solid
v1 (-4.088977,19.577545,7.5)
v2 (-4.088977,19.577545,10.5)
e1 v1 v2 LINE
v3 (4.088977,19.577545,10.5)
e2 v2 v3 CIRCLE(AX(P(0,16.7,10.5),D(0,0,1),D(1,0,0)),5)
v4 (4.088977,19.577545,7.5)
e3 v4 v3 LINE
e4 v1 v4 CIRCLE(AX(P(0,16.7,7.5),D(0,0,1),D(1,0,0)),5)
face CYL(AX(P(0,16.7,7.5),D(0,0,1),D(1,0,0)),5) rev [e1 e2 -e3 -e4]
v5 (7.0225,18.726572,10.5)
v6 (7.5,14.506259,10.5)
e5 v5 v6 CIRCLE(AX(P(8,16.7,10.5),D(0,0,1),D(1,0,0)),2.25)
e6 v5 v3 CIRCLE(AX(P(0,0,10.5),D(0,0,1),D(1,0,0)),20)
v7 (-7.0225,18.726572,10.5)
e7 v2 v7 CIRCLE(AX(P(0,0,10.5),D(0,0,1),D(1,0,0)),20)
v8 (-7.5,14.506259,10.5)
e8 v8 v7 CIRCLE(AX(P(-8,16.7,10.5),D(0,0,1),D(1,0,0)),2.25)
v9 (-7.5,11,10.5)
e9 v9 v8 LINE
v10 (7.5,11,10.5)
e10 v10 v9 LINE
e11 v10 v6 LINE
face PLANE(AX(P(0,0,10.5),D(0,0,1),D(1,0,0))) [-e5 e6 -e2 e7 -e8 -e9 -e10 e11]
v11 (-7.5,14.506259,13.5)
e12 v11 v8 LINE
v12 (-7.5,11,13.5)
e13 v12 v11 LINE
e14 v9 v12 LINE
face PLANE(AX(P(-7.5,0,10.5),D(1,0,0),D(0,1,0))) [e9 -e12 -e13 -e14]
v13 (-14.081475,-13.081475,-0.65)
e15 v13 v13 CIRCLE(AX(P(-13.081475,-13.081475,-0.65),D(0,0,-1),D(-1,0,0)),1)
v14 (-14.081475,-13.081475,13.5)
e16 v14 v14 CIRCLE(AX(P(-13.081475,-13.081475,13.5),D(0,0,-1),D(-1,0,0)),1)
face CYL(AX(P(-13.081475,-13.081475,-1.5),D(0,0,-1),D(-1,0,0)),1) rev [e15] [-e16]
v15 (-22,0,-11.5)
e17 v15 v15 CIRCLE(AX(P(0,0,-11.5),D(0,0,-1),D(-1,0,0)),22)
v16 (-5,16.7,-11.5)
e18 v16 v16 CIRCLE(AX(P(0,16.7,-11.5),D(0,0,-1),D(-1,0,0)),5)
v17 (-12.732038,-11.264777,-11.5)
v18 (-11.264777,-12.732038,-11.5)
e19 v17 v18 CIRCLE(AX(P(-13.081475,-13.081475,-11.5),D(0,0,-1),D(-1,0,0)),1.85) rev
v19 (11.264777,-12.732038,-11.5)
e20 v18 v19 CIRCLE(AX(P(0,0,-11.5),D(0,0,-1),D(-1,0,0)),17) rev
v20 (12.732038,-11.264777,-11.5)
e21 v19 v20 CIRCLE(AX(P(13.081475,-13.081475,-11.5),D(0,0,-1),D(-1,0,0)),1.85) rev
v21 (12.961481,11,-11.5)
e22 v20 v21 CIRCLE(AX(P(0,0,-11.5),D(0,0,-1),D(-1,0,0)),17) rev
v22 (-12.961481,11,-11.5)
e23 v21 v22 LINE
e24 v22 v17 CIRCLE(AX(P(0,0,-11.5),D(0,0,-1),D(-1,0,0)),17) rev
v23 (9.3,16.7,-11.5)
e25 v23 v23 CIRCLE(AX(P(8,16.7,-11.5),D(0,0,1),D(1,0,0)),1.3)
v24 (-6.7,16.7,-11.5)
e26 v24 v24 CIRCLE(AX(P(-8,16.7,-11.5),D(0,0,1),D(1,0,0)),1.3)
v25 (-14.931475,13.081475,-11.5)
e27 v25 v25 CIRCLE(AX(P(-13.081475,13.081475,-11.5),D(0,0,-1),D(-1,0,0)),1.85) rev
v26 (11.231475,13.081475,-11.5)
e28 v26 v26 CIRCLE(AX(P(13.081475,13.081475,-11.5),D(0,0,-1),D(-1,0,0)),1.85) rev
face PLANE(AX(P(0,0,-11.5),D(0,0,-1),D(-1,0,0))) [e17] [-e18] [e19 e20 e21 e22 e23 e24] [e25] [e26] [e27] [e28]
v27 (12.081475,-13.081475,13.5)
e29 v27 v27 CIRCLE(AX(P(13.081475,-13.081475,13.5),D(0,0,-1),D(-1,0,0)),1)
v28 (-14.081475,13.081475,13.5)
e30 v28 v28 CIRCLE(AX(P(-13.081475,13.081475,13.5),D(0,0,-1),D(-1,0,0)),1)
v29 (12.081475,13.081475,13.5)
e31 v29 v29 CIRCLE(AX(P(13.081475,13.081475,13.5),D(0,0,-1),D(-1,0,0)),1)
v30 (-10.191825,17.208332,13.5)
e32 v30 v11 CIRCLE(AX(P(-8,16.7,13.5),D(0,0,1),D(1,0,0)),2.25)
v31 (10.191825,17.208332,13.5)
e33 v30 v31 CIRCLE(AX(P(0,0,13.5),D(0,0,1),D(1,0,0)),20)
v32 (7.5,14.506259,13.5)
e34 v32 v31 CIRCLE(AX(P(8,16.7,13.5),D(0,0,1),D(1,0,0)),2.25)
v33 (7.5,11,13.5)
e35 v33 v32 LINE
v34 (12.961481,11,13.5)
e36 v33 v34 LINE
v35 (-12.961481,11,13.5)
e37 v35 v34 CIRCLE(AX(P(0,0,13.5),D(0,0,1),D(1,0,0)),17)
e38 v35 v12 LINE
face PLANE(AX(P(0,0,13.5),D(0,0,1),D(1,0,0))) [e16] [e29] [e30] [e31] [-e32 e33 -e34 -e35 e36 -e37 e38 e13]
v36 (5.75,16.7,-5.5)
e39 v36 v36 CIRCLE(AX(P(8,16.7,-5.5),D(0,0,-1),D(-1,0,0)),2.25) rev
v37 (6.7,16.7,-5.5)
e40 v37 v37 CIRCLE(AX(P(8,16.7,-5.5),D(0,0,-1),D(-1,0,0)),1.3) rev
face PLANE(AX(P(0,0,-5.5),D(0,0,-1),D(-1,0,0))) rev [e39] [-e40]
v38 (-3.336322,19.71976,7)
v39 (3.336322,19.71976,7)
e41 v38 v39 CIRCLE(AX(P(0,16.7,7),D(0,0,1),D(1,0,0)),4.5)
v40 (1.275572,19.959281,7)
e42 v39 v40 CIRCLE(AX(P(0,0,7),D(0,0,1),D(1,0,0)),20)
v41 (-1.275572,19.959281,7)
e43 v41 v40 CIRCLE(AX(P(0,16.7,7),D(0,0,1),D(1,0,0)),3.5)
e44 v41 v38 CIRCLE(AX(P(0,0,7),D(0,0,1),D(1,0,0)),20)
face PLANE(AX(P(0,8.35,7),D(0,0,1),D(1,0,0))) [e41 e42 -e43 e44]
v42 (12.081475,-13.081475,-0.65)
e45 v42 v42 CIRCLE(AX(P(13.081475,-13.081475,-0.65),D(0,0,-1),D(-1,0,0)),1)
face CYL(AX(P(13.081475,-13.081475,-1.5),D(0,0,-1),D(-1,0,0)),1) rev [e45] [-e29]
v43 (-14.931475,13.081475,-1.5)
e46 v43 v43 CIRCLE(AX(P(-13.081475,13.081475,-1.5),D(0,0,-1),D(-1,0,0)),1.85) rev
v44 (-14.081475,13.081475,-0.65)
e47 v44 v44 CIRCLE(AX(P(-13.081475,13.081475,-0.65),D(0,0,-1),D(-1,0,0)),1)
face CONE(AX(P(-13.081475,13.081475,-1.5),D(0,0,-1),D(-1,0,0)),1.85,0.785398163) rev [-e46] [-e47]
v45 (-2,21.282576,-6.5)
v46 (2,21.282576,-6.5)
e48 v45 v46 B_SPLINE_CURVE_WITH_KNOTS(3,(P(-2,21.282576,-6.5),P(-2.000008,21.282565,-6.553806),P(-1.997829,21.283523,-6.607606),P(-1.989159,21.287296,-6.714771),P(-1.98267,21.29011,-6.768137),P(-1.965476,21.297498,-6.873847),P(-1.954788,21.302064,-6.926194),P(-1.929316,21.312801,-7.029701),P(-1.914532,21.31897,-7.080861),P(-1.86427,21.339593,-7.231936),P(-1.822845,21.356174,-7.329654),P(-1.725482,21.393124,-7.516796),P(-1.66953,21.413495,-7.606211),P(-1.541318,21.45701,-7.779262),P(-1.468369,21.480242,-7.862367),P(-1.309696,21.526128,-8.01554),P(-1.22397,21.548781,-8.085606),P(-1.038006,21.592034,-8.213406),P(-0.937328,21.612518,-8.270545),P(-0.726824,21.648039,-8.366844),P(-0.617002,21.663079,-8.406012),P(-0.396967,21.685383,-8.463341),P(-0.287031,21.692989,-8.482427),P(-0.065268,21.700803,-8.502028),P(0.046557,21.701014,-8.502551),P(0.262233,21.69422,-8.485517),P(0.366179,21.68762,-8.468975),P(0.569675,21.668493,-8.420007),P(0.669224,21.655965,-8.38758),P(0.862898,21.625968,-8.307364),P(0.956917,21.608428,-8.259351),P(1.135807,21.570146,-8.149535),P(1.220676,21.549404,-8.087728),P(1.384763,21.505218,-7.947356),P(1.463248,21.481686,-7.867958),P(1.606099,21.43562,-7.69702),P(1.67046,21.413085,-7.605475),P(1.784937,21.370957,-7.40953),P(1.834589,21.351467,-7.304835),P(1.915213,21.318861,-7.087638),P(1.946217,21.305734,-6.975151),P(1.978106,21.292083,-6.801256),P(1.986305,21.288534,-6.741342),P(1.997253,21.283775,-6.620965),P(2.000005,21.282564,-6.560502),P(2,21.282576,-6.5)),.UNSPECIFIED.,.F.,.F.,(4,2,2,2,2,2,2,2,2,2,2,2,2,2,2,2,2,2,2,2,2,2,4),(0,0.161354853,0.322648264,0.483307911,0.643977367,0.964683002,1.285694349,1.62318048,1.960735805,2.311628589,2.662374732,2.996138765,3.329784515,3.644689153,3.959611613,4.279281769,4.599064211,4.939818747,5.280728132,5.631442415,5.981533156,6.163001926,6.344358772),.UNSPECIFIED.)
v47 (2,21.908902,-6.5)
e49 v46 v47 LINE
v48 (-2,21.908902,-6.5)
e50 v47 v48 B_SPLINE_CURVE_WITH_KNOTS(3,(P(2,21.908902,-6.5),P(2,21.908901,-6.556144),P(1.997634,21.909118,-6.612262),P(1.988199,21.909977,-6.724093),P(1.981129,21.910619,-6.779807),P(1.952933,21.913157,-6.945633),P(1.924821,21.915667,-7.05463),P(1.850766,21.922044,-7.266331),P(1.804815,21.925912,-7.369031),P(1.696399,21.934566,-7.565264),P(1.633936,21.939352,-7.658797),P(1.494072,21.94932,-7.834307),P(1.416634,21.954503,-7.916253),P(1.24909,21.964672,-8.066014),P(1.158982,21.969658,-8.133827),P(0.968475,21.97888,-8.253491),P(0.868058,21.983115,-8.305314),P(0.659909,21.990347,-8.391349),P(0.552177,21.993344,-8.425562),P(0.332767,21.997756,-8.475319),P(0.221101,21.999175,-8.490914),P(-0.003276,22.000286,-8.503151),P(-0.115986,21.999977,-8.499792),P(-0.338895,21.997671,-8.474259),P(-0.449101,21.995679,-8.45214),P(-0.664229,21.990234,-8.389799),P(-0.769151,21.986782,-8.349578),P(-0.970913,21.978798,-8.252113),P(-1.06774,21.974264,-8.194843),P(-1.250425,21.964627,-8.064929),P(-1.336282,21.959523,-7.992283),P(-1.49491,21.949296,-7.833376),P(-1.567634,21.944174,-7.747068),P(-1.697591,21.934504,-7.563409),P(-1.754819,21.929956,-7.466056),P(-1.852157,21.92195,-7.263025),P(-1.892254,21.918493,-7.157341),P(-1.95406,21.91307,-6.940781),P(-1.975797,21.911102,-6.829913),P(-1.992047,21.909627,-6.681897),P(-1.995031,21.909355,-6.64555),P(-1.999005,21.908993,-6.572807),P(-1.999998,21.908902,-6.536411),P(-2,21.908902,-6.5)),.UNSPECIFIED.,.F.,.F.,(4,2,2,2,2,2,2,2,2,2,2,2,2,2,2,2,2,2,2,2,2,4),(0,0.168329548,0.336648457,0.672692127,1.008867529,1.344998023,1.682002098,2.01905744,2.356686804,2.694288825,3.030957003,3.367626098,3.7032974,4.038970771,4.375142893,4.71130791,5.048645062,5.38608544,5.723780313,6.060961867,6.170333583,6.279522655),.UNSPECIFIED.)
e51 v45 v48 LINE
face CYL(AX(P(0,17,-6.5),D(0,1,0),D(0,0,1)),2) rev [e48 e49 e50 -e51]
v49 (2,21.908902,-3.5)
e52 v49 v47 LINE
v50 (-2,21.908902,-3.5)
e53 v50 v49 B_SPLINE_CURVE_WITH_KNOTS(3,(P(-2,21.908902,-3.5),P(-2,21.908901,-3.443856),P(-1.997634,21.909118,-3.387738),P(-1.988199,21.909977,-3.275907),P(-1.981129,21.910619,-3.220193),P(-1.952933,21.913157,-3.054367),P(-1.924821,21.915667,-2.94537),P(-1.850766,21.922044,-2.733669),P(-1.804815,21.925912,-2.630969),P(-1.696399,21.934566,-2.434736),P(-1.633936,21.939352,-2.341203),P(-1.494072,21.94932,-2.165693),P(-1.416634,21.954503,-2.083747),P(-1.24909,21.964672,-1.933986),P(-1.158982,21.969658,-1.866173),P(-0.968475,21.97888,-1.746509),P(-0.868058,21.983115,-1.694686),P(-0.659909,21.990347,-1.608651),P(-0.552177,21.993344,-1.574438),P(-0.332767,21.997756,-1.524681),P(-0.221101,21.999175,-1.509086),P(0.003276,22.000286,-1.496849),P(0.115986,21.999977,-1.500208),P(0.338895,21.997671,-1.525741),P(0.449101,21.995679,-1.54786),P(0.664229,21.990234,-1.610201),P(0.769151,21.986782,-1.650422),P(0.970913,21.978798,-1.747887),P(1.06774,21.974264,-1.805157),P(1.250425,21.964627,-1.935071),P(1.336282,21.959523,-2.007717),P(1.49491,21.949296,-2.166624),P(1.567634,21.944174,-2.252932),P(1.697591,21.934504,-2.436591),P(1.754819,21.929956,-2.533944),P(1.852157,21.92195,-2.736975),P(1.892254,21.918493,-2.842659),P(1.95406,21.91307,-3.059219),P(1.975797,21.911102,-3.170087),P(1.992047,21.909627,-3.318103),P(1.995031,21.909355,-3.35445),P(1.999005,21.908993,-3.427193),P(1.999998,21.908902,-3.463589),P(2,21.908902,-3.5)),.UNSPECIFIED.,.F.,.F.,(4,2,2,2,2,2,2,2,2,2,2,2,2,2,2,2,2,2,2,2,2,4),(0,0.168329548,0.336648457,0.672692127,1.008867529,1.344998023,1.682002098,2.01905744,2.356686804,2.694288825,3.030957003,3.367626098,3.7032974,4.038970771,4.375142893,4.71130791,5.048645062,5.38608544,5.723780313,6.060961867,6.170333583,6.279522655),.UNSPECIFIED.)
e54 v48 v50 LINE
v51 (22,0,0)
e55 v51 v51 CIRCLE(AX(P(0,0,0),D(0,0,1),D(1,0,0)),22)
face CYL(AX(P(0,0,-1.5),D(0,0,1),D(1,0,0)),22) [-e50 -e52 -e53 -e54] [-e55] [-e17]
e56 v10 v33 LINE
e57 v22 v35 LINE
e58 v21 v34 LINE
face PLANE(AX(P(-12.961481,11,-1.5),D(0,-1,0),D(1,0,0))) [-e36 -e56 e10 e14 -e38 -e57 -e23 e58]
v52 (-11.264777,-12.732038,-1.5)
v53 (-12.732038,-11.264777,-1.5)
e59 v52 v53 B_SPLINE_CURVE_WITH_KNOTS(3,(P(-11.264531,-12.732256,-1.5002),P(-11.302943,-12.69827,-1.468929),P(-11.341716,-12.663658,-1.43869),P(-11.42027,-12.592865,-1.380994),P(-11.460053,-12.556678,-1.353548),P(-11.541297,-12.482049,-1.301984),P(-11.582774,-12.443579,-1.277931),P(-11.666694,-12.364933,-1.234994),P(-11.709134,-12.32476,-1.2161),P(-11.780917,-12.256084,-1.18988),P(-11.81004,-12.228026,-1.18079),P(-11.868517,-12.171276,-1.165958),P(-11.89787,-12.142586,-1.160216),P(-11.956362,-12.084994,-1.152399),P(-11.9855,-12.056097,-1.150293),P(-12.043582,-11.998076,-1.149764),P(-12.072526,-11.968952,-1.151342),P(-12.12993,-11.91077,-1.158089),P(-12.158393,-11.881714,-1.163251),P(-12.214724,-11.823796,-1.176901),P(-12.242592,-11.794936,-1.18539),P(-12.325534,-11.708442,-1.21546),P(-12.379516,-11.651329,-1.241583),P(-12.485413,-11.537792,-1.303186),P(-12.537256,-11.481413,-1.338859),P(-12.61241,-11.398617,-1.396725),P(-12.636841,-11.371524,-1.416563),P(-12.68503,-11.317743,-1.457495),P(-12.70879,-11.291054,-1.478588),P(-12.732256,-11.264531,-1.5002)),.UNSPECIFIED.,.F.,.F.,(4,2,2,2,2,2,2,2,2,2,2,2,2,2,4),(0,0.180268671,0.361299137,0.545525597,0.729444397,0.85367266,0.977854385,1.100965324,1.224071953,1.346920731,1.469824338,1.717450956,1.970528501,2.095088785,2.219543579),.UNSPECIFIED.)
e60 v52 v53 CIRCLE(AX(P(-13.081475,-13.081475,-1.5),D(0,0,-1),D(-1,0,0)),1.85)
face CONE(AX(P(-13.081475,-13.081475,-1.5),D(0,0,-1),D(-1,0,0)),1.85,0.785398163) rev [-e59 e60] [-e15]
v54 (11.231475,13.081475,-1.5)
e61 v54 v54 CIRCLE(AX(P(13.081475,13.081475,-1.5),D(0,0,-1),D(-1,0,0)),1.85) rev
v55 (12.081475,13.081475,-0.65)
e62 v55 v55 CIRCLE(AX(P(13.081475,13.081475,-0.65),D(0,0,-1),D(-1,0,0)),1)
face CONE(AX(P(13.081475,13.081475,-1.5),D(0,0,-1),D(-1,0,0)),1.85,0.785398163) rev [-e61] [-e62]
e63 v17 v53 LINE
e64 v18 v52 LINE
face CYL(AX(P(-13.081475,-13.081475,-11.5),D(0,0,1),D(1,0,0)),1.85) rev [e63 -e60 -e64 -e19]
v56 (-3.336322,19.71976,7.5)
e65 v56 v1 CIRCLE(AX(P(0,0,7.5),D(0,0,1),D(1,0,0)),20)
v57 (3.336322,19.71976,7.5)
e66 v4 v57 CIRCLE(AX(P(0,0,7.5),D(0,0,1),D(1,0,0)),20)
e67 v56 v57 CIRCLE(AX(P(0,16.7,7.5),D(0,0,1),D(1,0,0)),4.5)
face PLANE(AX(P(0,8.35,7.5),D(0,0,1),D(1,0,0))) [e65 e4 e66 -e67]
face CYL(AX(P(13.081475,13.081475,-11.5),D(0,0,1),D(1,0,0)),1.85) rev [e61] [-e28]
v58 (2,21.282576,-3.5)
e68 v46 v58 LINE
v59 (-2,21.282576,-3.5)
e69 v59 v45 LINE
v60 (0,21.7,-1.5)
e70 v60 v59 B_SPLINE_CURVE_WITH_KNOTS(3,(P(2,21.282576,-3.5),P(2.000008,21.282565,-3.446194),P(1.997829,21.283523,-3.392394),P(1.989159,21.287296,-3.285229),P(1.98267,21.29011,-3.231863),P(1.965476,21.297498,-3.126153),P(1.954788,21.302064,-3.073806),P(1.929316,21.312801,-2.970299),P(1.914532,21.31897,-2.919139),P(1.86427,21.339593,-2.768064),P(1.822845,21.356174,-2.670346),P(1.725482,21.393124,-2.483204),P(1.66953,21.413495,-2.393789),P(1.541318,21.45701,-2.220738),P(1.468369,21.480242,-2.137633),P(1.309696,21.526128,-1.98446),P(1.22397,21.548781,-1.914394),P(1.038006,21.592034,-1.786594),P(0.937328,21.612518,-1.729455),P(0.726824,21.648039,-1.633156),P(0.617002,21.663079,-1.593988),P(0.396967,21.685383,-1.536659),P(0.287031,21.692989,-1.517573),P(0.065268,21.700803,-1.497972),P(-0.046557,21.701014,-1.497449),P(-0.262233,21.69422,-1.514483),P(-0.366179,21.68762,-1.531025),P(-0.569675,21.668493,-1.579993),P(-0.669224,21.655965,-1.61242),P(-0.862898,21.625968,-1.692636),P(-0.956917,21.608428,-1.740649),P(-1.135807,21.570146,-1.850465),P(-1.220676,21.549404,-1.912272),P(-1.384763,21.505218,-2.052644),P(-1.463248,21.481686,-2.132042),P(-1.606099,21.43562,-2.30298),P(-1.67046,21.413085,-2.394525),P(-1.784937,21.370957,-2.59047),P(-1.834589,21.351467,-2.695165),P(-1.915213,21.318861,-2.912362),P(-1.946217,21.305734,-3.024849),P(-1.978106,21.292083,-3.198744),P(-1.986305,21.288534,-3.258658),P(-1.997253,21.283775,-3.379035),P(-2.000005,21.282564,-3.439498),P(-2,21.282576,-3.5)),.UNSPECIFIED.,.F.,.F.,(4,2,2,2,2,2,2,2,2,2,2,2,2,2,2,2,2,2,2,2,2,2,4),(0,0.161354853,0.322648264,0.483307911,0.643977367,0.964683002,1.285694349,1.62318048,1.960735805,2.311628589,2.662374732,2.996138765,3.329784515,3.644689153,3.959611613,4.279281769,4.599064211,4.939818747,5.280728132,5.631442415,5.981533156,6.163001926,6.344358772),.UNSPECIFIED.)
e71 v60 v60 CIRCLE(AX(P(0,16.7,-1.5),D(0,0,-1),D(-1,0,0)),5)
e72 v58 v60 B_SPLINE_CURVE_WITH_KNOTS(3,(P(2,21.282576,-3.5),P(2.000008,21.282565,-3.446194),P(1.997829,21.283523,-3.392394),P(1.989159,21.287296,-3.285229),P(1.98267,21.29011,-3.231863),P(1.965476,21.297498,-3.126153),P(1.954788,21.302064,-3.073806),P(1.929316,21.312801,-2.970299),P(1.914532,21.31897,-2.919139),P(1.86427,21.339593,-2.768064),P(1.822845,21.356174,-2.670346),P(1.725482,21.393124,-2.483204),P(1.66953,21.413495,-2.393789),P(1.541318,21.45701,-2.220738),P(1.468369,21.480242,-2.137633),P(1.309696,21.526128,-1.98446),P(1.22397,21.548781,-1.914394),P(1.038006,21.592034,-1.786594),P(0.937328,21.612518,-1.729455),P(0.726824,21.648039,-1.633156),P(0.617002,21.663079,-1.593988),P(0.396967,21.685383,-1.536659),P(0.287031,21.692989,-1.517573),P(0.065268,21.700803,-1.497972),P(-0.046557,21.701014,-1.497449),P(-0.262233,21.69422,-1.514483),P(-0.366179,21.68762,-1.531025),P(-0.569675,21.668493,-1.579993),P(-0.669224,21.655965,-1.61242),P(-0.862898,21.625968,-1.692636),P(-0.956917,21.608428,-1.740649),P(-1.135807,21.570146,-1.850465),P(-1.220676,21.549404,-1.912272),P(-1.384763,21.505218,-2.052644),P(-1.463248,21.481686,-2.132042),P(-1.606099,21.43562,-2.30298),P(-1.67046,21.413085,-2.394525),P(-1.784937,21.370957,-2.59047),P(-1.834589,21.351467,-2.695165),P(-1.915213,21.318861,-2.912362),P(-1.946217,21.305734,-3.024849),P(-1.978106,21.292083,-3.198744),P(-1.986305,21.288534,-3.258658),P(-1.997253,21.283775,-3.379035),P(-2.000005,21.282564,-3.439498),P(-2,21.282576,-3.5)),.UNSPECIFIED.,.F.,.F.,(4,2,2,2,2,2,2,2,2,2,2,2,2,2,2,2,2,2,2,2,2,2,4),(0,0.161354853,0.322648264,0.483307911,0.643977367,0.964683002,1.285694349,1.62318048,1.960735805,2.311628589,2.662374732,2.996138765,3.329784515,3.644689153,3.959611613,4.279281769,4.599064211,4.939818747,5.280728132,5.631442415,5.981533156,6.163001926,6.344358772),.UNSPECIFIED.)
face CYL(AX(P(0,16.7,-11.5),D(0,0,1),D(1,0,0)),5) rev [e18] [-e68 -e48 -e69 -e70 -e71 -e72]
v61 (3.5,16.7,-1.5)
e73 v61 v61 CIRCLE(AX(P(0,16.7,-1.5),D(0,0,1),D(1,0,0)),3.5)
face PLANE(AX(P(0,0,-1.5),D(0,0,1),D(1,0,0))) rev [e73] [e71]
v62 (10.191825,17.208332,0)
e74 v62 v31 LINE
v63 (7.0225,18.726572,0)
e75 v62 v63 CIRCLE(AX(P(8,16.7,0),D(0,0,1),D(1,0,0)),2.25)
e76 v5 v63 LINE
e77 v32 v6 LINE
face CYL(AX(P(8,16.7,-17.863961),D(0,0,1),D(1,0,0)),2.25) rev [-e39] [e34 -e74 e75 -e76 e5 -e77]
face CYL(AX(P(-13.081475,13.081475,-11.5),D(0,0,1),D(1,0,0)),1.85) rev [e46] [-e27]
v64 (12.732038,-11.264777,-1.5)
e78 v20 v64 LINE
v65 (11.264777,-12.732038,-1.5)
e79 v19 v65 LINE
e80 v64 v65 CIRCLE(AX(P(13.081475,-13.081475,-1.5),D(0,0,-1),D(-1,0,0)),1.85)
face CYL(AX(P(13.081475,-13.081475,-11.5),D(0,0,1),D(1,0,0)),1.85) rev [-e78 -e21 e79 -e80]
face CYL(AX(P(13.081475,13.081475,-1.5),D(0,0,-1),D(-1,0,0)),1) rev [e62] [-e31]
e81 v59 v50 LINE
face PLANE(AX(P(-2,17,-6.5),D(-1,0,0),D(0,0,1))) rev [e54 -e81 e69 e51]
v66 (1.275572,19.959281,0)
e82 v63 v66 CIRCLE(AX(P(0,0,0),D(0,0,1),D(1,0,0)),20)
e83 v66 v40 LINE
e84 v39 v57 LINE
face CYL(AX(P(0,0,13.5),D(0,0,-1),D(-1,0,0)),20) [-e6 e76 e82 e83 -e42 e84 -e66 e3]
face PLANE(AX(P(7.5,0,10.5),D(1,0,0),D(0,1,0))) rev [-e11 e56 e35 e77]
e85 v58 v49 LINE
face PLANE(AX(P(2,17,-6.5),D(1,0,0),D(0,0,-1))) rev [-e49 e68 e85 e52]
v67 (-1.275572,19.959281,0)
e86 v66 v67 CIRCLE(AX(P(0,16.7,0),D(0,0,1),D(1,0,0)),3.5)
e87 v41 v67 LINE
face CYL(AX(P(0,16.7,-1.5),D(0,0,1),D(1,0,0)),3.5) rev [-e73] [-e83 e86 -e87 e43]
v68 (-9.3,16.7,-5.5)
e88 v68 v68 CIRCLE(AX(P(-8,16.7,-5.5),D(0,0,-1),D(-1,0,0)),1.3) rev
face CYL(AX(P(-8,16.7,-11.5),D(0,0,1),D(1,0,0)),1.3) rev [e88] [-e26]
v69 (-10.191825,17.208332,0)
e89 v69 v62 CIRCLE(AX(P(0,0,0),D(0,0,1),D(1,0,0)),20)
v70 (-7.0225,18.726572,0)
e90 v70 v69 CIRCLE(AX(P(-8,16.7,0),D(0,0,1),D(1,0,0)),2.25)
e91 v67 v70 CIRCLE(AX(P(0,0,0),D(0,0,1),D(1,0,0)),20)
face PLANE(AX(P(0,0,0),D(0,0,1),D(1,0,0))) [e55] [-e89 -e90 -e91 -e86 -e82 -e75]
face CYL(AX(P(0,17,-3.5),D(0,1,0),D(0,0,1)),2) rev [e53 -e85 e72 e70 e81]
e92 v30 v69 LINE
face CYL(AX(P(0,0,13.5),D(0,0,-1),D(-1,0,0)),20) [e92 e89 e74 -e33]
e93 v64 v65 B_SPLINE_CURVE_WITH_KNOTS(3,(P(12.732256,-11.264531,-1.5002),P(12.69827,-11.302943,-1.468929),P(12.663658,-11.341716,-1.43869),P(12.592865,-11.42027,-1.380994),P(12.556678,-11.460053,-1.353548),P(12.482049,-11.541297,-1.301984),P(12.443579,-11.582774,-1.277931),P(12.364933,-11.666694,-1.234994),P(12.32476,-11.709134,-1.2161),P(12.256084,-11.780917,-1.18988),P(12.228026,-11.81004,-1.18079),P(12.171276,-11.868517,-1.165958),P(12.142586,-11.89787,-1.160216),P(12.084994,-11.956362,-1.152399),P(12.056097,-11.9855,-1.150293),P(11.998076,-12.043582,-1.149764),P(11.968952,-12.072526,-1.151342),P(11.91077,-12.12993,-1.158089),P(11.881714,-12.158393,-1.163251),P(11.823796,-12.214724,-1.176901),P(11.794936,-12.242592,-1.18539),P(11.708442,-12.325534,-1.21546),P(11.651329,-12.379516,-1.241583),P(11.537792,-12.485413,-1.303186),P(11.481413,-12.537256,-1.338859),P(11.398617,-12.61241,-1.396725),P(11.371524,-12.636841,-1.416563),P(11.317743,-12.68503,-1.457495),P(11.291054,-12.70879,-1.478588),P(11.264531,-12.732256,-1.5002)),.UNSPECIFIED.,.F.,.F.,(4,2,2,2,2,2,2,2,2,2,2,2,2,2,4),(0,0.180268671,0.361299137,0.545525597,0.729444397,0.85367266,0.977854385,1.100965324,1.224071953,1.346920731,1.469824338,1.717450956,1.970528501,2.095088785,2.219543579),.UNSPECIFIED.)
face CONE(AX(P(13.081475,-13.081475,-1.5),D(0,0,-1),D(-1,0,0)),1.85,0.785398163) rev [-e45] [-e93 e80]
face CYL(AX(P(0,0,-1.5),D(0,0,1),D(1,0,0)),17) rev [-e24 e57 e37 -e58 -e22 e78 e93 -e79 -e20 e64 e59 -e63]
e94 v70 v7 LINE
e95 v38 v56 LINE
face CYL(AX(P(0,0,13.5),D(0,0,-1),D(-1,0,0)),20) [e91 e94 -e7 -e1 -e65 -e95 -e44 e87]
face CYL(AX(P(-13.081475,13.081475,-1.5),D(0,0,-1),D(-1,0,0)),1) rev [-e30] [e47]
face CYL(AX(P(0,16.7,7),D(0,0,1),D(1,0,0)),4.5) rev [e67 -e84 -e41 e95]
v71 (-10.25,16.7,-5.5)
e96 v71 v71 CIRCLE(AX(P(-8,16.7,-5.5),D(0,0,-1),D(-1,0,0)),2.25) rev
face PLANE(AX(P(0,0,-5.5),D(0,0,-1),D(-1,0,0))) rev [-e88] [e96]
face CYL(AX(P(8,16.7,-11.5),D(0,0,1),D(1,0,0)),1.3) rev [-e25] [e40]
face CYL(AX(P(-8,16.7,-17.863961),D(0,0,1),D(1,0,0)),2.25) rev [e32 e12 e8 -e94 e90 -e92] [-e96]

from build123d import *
from build123d.topology import SkipClean

# Parameters (mm, degrees)
SKIZZE1_R                                            = 22
AUFSATZ_LINEAR_AUSTRAGEN1_DEPTH                      = 1.5
AUFSATZ_LINEAR_START                                 = 13.5
SKIZZE1_6_R                                          = 20
AUFSATZ_LINEAR_AUSTRAGEN2_DEPTH                      = 13.5
SCHNITT_LINEAR_START                                 = 10.5
SCHNITT_LINEAR_AUSTRAGEN2_DEPTH                      = 3
SKIZZE1_9_R                                          = 5
SCHNITT_LINEAR_AUSTRAGEN3_DEPTH                      = 3
SCHNITT_LINEAR_START_2                               = 7
SCHNITT_LINEAR_AUSTRAGEN4_DEPTH                      = 0.5
SCHNITT_LINEAR_AUSTRAGEN5_DEPTH                      = 34.915335764
SCHNITT_LINEAR_AUSTRAGEN5_DEPTH_BACK                 = 34.915335764
SKIZZE1_11_R                                         = 3.5
SKIZZE3_R                                            = 0.75
SCHNITT_LINEAR_AUSTRAGEN6_DEPTH                      = 8
FORMSENKUNG_F_R_M3_SENKSCHRAUBE_MIT_INNE_D           = 2
FORMSENKUNG_F_R_M3_SENKSCHRAUBE_MIT_INNE_CSINK_D     = 3.7
FORMSENKUNG_F_R_M3_SENKSCHRAUBE_MIT_INNE_CSINK_ANGLE = 90
SKIZZE9_R                                            = 22
SKIZZE9_R_2                                          = 5
SKIZZE9_R_3                                          = 1.85
AUFSATZ_LINEAR_AUSTRAGEN5_DEPTH                      = 10
SKIZZE12_R                                           = 1.3
SCHNITT_LINEAR_AUSTRAGEN8_DEPTH                      = 40.912404087
SKIZZE12_3_R                                         = 2.25
SKIZZE12_3_R_2                                       = 1.3
SCHNITT_LINEAR_AUSTRAGEN9_DEPTH                      = 19
SCHNITT_LINEAR_AUSTRAGEN11_DEPTH                     = 5


# Read off the part's stored shape, not the designer's step: Schnitt-Linear austragen4
with BuildPart() as part:
    # Skizze1 → Aufsatz-Linear austragen1 (new body)
    with BuildSketch(Plane.XY):
        Circle(SKIZZE1_R)
        with BuildLine():
            Line((-12.961481397, 11), (12.961481397, 11))
            ThreePointArc((12.961481397, 11), (0, -17), (-12.961481397, 11))
        make_face(mode=Mode.SUBTRACT)
    extrude(amount=-AUFSATZ_LINEAR_AUSTRAGEN1_DEPTH)

    # Skizze1<6> → Aufsatz-Linear austragen2 (add)
    with BuildSketch(Plane.XY.offset(AUFSATZ_LINEAR_START)):
        Circle(SKIZZE1_6_R)
        with BuildLine():
            ThreePointArc((12.961481397, 11), (0, -17), (-12.961481397, 11))
            Line((-12.961481397, 11), (12.961481397, 11))
        make_face(mode=Mode.SUBTRACT)
    extrude(amount=-AUFSATZ_LINEAR_AUSTRAGEN2_DEPTH)

    # Skizze1<8> → Schnitt-Linear austragen2 (cut)
    with BuildSketch(Plane.XY.offset(SCHNITT_LINEAR_START)):
        with BuildLine():
            Line((-7.5, 18.540496218), (-7.5, 11))
            Line((-7.5, 11), (7.5, 11))
            Line((7.5, 11), (7.5, 18.540496218))
            ThreePointArc((7.5, 18.540496218), (0, 20), (-7.5, 18.540496218))
        make_face()
    extrude(amount=SCHNITT_LINEAR_AUSTRAGEN2_DEPTH, mode=Mode.SUBTRACT)

    # Skizze1<9> → Schnitt-Linear austragen3 (cut)
    with BuildSketch(Plane.XY.offset(SCHNITT_LINEAR_START)):
        with Locations((0, 16.7)):
            Circle(SKIZZE1_9_R)
    extrude(amount=-SCHNITT_LINEAR_AUSTRAGEN3_DEPTH, mode=Mode.SUBTRACT)

    # Schnitt-Linear austragen4 outline → Schnitt-Linear austragen4 (cut)
    with BuildSketch(Plane.XY.offset(SCHNITT_LINEAR_START_2)):
        with BuildLine():
            ThreePointArc((3.336322324, 19.719760479), (0, 20), (-3.336322324, 19.719760479))
            ThreePointArc((-3.336322324, 19.719760479), (0, 12.2), (3.336322324, 19.719760479))
        make_face()
    extrude(amount=SCHNITT_LINEAR_AUSTRAGEN4_DEPTH, mode=Mode.SUBTRACT)

    # Skizze1<11> → Schnitt-Linear austragen5 (cut, two sides: drawn at the far end of the back side and taken through both)
    with BuildSketch(Plane.XY.offset(-SCHNITT_LINEAR_AUSTRAGEN5_DEPTH_BACK)):
        with Locations((0, 16.7)):
            Circle(SKIZZE1_11_R)
    extrude(amount=SCHNITT_LINEAR_AUSTRAGEN5_DEPTH + SCHNITT_LINEAR_AUSTRAGEN5_DEPTH_BACK, mode=Mode.SUBTRACT)

    # Skizze3 → Schnitt-Linear austragen6 (cut)
    with BuildSketch(Plane(origin=(0, 0, 13.5), x_dir=(-1, 0, 0), z_dir=(0, 0, -1))):
        with Locations((-13.081475452, 13.081475452)):
            Circle(SKIZZE3_R)
        with Locations((13.081475452, 13.081475452)):
            Circle(SKIZZE3_R)
        with Locations((13.081475452, -13.081475452)):
            Circle(SKIZZE3_R)
        with Locations((-13.081475452, -13.081475452)):
            Circle(SKIZZE3_R)
    extrude(amount=SCHNITT_LINEAR_AUSTRAGEN6_DEPTH, mode=Mode.SUBTRACT)

    # Formsenkung für M3 Senkschraube mit Innensechskant1 (through all)
    with Locations(Plane(origin=(0, 0, -1.5), x_dir=(-1, 0, 0), z_dir=(0, 0, -1))):
        with Locations((-13.081475452, 13.081475452), (13.081475452, 13.081475452), (13.081475452, -13.081475452), (-13.081475452, -13.081475452)):
            CounterSinkHole(FORMSENKUNG_F_R_M3_SENKSCHRAUBE_MIT_INNE_D / 2, FORMSENKUNG_F_R_M3_SENKSCHRAUBE_MIT_INNE_CSINK_D / 2, counter_sink_angle=FORMSENKUNG_F_R_M3_SENKSCHRAUBE_MIT_INNE_CSINK_ANGLE)

    # Skizze9 → Aufsatz-Linear austragen5 (add)
    with BuildSketch(Plane(origin=(0, 0, -1.5), x_dir=(-1, 0, 0), z_dir=(0, 0, -1))):
        with Locations(Location((0, 0, 0), (0, 0, 180))):
            Circle(SKIZZE9_R)
        with Locations((0, 16.7)):
            Circle(SKIZZE9_R_2, mode=Mode.SUBTRACT)
        with Locations((13.081475452, 13.081475452)):
            Circle(SKIZZE9_R_3, mode=Mode.SUBTRACT)
        with Locations((-13.081475452, 13.081475452)):
            Circle(SKIZZE9_R_3, mode=Mode.SUBTRACT)
        with BuildLine():
            ThreePointArc((12.961481397, 11), (16.999097396, -0.175179101), (12.732038414, -11.264776865))
            ThreePointArc((12.732038414, -11.264776865), (14.389622997, -14.389622997), (11.264776865, -12.732038414))
            ThreePointArc((11.264776865, -12.732038414), (0, -17), (-11.264776865, -12.732038414))
            ThreePointArc((-11.264776865, -12.732038414), (-14.389622997, -14.389622997), (-12.732038414, -11.264776865))
            ThreePointArc((-12.732038414, -11.264776865), (-16.999097396, -0.175179101), (-12.961481397, 11))
            Line((-12.961481397, 11), (12.961481397, 11))
        make_face(mode=Mode.SUBTRACT)
    extrude(amount=AUFSATZ_LINEAR_AUSTRAGEN5_DEPTH)

    # Skizze12 → Schnitt-Linear austragen8 (cut, through all)
    with BuildSketch(Plane.XY.offset(13.5)):
        with Locations((-8, 16.7)):
            Circle(SKIZZE12_R)
        with Locations((8, 16.7)):
            Circle(SKIZZE12_R)
    extrude(amount=-SCHNITT_LINEAR_AUSTRAGEN8_DEPTH, mode=Mode.SUBTRACT)

    # Skizze12<3> → Schnitt-Linear austragen9 (cut)
    # profile 1 of 2: a face of its own
    with BuildSketch(Plane.XY.offset(13.5)):
        with Locations(Location((-8, 16.7, 0), (0, 0, 64.250049819))):
            Circle(SKIZZE12_3_R)
        with Locations((-8, 16.7)):
            Circle(SKIZZE12_3_R_2, mode=Mode.SUBTRACT)
    # profile 2 of 2: a face of its own
    with BuildSketch(Plane.XY.offset(13.5)):
        with Locations(Location((8, 16.7, 0), (0, 0, 13.057301294))):
            Circle(SKIZZE12_3_R)
        with Locations((8, 16.7)):
            Circle(SKIZZE12_3_R_2, mode=Mode.SUBTRACT)
    extrude(amount=-SCHNITT_LINEAR_AUSTRAGEN9_DEPTH, mode=Mode.SUBTRACT)

    # Skizze14 → Schnitt-Linear austragen11 (cut)
    with SkipClean():  # the faces are left unmerged after this step: merging them gives an invalid solid
        with BuildSketch(Plane(origin=(0, 22, 0), x_dir=(1, 0, 0), z_dir=(0, 1, 0))):
            with BuildLine():
                Line((2, 6.5), (2, 3.5))
                ThreePointArc((2, 3.5), (0, 1.5), (-2, 3.5))
                Line((-2, 3.5), (-2, 6.5))
                ThreePointArc((-2, 6.5), (0, 8.5), (2, 6.5))
            make_face()
        extrude(amount=-SCHNITT_LINEAR_AUSTRAGEN11_DEPTH, mode=Mode.SUBTRACT)


solid = part.part
